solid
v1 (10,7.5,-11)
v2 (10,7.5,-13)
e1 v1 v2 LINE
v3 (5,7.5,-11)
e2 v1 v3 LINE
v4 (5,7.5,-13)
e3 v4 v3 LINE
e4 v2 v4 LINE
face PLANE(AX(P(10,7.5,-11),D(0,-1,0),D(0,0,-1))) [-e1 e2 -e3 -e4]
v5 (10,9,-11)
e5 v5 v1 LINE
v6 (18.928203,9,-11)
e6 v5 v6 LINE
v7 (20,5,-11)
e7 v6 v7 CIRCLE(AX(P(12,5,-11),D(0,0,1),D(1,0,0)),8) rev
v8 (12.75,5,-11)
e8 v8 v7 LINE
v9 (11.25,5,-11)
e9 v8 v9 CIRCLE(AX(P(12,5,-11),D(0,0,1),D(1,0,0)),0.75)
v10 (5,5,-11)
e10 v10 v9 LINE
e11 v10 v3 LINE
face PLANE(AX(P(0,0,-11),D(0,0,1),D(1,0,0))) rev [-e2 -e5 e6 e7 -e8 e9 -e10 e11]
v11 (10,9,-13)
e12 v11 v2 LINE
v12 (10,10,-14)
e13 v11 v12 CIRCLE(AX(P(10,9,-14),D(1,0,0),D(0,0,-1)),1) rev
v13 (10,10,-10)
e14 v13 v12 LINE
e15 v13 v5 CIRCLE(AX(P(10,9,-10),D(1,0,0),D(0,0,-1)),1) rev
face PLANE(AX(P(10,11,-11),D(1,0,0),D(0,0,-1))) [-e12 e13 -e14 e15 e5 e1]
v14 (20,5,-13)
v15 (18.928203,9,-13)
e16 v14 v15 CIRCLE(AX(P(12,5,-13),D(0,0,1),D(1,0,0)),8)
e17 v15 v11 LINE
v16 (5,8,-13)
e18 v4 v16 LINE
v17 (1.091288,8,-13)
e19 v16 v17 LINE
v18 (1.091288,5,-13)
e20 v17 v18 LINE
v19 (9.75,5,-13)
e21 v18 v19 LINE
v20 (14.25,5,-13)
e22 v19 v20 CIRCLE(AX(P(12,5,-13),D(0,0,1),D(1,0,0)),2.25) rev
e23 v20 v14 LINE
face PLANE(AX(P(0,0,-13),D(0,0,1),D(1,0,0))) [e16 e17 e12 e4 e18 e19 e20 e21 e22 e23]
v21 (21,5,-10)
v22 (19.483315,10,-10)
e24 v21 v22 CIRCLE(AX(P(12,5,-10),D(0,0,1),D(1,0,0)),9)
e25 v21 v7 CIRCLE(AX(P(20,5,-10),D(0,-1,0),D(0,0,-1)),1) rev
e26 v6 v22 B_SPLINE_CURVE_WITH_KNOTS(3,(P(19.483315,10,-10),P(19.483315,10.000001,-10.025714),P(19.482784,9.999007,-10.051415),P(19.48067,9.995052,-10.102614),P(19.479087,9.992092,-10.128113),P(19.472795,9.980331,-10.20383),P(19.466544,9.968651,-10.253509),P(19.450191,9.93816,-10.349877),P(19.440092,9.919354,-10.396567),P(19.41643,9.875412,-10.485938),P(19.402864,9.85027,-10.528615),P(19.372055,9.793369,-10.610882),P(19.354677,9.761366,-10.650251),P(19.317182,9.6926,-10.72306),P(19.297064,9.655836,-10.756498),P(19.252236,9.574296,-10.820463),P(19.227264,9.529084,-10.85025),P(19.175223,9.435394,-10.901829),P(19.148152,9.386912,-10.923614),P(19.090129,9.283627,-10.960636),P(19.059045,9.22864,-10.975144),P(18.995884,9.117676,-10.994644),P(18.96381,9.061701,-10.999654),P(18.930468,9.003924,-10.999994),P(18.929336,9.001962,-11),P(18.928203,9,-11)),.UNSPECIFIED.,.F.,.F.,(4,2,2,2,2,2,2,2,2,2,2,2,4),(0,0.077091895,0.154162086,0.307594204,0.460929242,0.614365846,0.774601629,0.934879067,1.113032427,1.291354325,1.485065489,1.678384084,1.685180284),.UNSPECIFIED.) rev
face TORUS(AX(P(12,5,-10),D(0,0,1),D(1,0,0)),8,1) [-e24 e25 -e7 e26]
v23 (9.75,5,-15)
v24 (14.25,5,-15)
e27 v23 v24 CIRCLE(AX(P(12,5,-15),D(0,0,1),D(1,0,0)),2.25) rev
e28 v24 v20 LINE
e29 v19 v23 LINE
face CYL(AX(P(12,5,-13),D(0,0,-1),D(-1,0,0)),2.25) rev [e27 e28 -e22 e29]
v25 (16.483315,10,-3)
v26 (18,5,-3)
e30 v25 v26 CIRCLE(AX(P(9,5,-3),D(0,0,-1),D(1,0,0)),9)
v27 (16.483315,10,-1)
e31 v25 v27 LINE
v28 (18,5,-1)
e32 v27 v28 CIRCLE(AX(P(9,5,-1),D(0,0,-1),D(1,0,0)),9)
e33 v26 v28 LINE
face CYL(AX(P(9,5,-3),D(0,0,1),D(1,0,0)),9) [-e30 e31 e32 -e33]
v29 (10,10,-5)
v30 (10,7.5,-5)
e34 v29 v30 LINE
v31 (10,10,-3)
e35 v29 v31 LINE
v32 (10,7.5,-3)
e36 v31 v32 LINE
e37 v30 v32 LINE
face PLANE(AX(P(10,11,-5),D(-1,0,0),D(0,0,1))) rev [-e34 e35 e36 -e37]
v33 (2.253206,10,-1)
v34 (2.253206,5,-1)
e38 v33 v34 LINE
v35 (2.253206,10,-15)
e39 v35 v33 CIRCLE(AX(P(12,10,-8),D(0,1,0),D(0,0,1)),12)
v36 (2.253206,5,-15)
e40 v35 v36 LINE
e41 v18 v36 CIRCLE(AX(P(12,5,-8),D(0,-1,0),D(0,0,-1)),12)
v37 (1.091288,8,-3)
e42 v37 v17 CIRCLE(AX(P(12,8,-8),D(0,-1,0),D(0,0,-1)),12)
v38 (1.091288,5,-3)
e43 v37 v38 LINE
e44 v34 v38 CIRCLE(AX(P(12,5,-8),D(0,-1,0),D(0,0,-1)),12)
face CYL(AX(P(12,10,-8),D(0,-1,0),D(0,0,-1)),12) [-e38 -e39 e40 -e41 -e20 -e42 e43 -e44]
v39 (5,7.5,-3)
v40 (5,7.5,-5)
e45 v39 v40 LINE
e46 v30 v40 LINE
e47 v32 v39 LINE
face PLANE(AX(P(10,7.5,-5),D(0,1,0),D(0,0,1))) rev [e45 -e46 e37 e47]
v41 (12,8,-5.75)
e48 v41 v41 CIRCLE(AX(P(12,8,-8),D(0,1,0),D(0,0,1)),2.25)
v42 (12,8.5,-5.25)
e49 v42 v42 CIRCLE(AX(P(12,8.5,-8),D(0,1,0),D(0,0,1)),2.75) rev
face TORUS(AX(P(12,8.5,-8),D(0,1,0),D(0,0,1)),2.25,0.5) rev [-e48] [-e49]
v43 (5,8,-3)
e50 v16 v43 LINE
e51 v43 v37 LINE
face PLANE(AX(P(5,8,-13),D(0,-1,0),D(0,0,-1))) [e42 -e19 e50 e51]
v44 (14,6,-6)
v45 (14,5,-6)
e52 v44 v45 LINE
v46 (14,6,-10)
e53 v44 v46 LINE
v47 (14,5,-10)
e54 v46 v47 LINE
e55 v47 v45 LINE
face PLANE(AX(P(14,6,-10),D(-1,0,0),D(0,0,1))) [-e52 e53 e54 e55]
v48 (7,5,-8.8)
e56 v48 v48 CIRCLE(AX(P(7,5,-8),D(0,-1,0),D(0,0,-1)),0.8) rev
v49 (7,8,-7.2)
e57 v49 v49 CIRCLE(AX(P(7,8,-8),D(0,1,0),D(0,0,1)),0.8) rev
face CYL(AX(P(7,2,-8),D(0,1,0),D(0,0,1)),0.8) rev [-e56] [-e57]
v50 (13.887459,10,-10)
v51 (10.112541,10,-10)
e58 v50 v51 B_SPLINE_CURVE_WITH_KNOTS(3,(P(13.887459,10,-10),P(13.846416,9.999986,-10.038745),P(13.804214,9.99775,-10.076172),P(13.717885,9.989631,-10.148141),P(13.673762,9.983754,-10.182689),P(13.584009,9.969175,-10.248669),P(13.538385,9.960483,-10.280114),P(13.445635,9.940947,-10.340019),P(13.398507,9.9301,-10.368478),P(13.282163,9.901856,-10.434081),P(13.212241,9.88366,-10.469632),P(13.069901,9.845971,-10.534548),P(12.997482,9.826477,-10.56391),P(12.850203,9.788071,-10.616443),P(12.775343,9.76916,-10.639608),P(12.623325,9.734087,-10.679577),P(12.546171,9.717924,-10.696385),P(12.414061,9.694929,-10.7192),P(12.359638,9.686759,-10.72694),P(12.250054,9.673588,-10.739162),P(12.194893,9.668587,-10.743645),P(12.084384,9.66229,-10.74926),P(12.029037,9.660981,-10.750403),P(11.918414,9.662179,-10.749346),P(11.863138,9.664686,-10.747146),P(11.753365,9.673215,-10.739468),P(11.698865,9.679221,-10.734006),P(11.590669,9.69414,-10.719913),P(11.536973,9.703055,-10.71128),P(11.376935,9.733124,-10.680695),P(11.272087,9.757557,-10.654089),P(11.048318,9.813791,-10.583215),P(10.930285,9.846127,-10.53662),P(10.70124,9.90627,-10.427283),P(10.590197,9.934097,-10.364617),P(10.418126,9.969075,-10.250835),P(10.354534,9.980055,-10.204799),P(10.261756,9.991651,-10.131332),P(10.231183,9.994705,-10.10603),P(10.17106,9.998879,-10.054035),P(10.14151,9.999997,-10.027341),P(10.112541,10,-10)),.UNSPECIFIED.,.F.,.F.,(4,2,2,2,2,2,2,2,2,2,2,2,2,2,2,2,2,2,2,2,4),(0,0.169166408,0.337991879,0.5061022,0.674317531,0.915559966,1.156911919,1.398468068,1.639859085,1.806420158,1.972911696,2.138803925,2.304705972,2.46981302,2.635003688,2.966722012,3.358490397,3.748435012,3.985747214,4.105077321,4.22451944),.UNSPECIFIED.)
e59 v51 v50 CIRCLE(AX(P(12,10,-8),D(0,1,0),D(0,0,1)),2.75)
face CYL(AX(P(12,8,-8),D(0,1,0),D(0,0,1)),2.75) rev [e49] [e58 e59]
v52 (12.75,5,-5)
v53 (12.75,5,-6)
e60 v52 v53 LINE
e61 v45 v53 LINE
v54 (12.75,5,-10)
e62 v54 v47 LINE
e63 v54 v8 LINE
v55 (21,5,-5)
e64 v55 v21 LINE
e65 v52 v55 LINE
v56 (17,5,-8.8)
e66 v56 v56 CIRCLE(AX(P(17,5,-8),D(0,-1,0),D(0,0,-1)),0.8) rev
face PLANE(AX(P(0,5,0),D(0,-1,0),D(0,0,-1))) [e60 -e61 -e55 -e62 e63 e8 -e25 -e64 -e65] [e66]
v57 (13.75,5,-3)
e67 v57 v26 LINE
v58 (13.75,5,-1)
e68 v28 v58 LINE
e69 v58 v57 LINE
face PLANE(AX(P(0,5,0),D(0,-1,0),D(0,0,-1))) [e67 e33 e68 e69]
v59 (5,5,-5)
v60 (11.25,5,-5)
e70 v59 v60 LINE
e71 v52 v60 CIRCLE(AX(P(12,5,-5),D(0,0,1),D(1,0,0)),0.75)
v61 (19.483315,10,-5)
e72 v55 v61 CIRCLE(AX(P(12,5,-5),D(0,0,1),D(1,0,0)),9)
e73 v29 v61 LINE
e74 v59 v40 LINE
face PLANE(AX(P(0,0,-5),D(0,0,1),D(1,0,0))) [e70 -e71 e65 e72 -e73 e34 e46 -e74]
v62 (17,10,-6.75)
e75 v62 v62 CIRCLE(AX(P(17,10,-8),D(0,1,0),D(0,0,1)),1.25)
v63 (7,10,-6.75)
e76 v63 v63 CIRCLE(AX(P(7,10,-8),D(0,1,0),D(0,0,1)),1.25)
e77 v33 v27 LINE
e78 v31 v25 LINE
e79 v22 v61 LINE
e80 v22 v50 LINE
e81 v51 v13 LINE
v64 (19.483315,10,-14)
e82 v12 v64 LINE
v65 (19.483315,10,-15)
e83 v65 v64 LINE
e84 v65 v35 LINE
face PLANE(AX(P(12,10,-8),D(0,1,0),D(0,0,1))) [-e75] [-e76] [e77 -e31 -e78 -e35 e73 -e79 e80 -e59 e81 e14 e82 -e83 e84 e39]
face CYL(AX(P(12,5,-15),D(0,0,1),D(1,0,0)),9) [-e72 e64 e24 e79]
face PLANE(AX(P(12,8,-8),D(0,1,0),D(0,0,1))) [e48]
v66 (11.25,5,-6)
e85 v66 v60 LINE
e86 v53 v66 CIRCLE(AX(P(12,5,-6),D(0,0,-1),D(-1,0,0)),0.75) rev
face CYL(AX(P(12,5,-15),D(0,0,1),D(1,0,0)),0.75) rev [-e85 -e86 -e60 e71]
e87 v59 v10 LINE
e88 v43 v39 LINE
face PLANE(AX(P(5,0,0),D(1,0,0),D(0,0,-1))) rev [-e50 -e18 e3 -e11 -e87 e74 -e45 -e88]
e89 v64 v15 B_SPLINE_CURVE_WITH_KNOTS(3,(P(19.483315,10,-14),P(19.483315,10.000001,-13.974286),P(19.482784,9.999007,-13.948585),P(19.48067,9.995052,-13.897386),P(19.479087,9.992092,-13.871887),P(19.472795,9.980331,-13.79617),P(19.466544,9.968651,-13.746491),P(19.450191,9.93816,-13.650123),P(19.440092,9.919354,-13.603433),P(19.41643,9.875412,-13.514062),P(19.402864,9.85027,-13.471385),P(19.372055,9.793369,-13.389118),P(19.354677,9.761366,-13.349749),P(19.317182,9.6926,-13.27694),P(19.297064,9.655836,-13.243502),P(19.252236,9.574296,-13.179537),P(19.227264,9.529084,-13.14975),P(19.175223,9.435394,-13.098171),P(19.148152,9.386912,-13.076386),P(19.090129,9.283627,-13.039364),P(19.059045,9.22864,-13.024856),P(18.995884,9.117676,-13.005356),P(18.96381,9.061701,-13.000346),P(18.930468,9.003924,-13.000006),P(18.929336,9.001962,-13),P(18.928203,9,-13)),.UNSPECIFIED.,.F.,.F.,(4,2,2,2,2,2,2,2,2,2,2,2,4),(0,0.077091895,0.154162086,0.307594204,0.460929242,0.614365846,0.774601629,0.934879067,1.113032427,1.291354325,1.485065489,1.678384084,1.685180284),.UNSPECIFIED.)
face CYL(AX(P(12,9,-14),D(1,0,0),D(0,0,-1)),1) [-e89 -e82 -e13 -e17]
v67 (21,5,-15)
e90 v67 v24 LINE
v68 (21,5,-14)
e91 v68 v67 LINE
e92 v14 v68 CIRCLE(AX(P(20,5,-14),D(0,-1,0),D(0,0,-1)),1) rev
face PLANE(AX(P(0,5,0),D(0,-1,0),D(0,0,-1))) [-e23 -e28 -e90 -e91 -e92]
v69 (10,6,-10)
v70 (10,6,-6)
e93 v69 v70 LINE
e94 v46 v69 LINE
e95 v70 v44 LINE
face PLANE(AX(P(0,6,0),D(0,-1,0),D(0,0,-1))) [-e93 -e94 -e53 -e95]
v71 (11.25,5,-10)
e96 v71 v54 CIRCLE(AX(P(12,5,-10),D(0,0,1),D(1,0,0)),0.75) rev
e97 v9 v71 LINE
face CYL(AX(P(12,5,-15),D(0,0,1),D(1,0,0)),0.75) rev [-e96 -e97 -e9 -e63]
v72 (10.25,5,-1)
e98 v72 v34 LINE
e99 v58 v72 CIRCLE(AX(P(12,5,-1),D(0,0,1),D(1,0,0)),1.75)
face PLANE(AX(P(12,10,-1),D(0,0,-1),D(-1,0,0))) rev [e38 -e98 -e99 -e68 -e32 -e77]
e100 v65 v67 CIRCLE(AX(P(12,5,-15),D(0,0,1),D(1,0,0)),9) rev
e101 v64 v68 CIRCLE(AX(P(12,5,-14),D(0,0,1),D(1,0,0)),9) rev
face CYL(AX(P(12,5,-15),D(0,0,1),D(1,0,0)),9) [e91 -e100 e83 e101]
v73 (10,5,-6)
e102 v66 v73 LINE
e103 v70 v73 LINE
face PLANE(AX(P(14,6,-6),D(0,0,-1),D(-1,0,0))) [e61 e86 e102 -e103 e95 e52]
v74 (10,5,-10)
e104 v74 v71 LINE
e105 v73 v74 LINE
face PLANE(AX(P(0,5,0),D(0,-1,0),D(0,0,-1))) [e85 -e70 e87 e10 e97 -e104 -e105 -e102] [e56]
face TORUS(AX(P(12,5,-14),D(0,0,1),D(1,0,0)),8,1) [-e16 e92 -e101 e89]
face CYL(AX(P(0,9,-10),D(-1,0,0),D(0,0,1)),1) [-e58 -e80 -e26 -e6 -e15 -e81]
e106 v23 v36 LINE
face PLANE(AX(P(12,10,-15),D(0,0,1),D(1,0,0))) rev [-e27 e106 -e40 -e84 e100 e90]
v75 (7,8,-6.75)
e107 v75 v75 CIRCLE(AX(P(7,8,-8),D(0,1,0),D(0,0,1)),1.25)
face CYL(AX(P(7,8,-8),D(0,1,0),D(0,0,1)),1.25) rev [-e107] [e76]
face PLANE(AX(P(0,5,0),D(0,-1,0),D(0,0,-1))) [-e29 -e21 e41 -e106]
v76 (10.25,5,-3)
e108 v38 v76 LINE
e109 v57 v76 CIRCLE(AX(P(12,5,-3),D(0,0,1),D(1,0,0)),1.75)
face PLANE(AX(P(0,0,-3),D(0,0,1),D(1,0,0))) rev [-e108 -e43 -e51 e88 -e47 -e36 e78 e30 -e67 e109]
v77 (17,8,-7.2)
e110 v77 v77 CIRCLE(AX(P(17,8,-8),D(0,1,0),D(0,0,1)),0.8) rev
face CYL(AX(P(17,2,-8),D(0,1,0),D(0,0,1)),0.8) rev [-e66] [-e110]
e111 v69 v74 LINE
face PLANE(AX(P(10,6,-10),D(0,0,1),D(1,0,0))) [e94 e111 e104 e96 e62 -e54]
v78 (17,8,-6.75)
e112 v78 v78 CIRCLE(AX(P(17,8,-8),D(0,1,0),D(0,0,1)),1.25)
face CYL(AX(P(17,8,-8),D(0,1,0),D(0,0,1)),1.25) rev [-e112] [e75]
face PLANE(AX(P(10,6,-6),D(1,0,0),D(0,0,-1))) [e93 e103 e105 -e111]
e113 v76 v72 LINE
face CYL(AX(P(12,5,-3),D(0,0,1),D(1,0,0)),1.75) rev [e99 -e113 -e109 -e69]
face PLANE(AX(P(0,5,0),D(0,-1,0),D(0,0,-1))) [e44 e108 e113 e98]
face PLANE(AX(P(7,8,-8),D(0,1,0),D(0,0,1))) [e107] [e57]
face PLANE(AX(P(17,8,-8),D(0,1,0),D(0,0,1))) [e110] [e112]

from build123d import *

# Parameters (mm, degrees)
BOSS_EXTRUDE1_DEPTH = 10
CUT_EXTRUDE3_DEPTH  = 28.676705006
CUT_EXTRUDE6_START  = -13
CUT_EXTRUDE6_DEPTH  = 2
CUT_EXTRUDE14_START = -3
CUT_EXTRUDE14_DEPTH = 2
CUT_EXTRUDE7_START  = 10
SKETCH8_R           = 2.75
CUT_EXTRUDE7_DEPTH  = 2
CUT_EXTRUDE8_START  = -16
SKETCH10_R          = 2.25
CUT_EXTRUDE8_DEPTH  = 3
CUT_EXTRUDE9_DEPTH  = 5
SKETCH18_R          = 0.75
CUT_EXTRUDE12_DEPTH = 28.676705006
CUT_EXTRUDE13_START = 5
SKETCH19_W          = 4
SKETCH19_H          = 4
CUT_EXTRUDE13_DEPTH = 1
CUT_EXTRUDE15_START = -1
SKETCH5_R           = 1.75
CUT_EXTRUDE15_DEPTH = 2
CUT_EXTRUDE16_START = -1
CUT_EXTRUDE16_DEPTH = 2
FILLET2_R           = 0.5
FILLET3_R           = 1
POT_INSERT_DEPTH    = 2.5
POT_START           = 4
SKETCH6_R           = 2.75
POT_HOLE_DEPTH      = 1.5
SCREW_START         = 11
SKETCH14_R          = 0.8
SCREW_HOLES_DEPTH   = 9
SCREW_START_2       = 10
SKETCH15_R          = 1.25
SCREW_HEADS_DEPTH   = 2
SKETCH13_W          = 21
SKETCH13_H          = 15
CUT_EXTRUDE11_DEPTH = 5


with BuildPart() as part:
    # Sketch1 → Boss-Extrude1 (new body)
    with BuildSketch(Plane(origin=(0, 0, 0), x_dir=(1, 0, 0), z_dir=(0, 1, 0))):
        with BuildLine():
            Line((21, 15), (21, 8))
            Line((21, 8), (21, 1))
            Line((21, 1), (12, 1))
            Line((12, 1), (2.253205655, 1))
            ThreePointArc((2.253205655, 1), (0, 8), (2.253205655, 15))
            Line((2.253205655, 15), (12, 15))
            Line((12, 15), (21, 15))
        make_face()
    extrude(amount=BOSS_EXTRUDE1_DEPTH)

    # Sketch4 → Cut-Extrude3 (cut, through all)
    with BuildSketch(Plane.XY):
        with BuildLine():
            Line((21, 14), (12, 14))
            ThreePointArc((12, 14), (18.363961031, 11.363961031), (21, 5))
            Line((21, 5), (21, 14))
        make_face()
        with BuildLine():
            Line((21, -4), (21, 5))
            ThreePointArc((21, 5), (18.363961031, -1.363961031), (12, -4))
            Line((12, -4), (21, -4))
        make_face()
    extrude(amount=-CUT_EXTRUDE3_DEPTH, mode=Mode.SUBTRACT)

    # Sketch7 → Cut-Extrude6 (cut)
    with BuildSketch(Plane.XY.offset(CUT_EXTRUDE6_START)):
        Polygon((21, 5.5), (21, 11), (10, 11), (10, 7.5), (0, 7.5), (0, 3.5), (21, 3.5), align=None)
    extrude(amount=CUT_EXTRUDE6_DEPTH, mode=Mode.SUBTRACT)

    # Sketch21 → Cut-Extrude14 (cut)
    with BuildSketch(Plane.XY.offset(CUT_EXTRUDE14_START)):
        Polygon((21, 5.5), (21, 11), (10, 11), (10, 7.5), (0, 7.5), (0, 3.5), (21, 3.5), align=None)
    extrude(amount=-CUT_EXTRUDE14_DEPTH, mode=Mode.SUBTRACT)

    # Sketch8 → Cut-Extrude7 (cut)
    with BuildSketch(Plane(origin=(0, 0, 0), x_dir=(1, 0, 0), z_dir=(0, 1, 0)).offset(CUT_EXTRUDE7_START)):
        with Locations(Location((12, 8, 0), (0, 0, 270))):
            Circle(SKETCH8_R)
    extrude(amount=-CUT_EXTRUDE7_DEPTH, mode=Mode.SUBTRACT)

    # Sketch10 → Cut-Extrude8 (cut)
    with BuildSketch(Plane.XY.offset(CUT_EXTRUDE8_START)):
        with Locations(Location((12, 5, 0), (0, 0, 221.810314896))):
            Circle(SKETCH10_R)
    extrude(amount=CUT_EXTRUDE8_DEPTH, mode=Mode.SUBTRACT)

    # Sketch11 → Cut-Extrude9 (cut)
    with BuildSketch(Plane(origin=(0, 0, 0), x_dir=(0, 0, -1), z_dir=(1, 0, 0))):
        Polygon((8, 2), (13, 2), (13, 8), (3, 8), (3, 2), align=None)
    extrude(amount=CUT_EXTRUDE9_DEPTH, mode=Mode.SUBTRACT)

    # Sketch18 → Cut-Extrude12 (cut, through all)
    with BuildSketch(Plane.XY):
        with Locations((12, 5)):
            Circle(SKETCH18_R)
    extrude(amount=-CUT_EXTRUDE12_DEPTH, mode=Mode.SUBTRACT)

    # Sketch19 → Cut-Extrude13 (cut, symmetric)
    with BuildSketch(Plane(origin=(0, 0, 0), x_dir=(1, 0, 0), z_dir=(0, 1, 0)).offset(CUT_EXTRUDE13_START)):
        with Locations((12, 8)):
            Rectangle(SKETCH19_W, SKETCH19_H)
    extrude(amount=CUT_EXTRUDE13_DEPTH, both=True, mode=Mode.SUBTRACT)

    # Sketch5 → Cut-Extrude15 (cut)
    with BuildSketch(Plane.XY.offset(CUT_EXTRUDE15_START)):
        with Locations((12, 5)):
            Circle(SKETCH5_R)
    extrude(amount=-CUT_EXTRUDE15_DEPTH, mode=Mode.SUBTRACT)

    # Sketch26 → Cut-Extrude16 (cut)
    with BuildSketch(Plane.XY.offset(CUT_EXTRUDE16_START)):
        with BuildLine():
            Line((16.483314774, 10), (19.483314774, 10))
            ThreePointArc((19.483314774, 10), (20.800790614, 6.883105034), (20.874119675, 3.5))
            Line((20.874119675, 3.5), (17.874119675, 3.5))
            ThreePointArc((17.874119675, 3.5), (17.800790614, 6.883105034), (16.483314774, 10))
        make_face()
    extrude(amount=-CUT_EXTRUDE16_DEPTH, mode=Mode.SUBTRACT)

    # Fillet2
    fillet2_edges = [part.edges().sort_by_distance(p)[0] for p in [
        (12, 8, -10.75),
    ]]
    fillet(fillet2_edges, radius=FILLET2_R)

    # Fillet3
    # the kernel refuses this fillet: 1 mm, written as the material it takes off along each edge
    with BuildSketch(Plane(origin=(12, 5, -13), x_dir=(0.6472427025312245, 0.7622839917118008, 0), z_dir=(-0.7622839917118008, 0.6472427025312245, 0))) as fillet3_piece_1_section:
        with BuildLine():
            CenterArc((9 - FILLET3_R, FILLET3_R), FILLET3_R, 270, 90)
            Line((9 - FILLET3_R, 0), (9, 0))
            Line((9, 0), (9, FILLET3_R))
        make_face()
    fillet3_piece_1 = revolve(axis=Axis((12, 5, -13), (0, 0, -1)), revolution_arc=75.177010416, mode=Mode.PRIVATE)
    fillet3_piece_1 = split(fillet3_piece_1, bisect_by=Plane(origin=(20.22008164, 3.5, -13.28352735), z_dir=(0, 1, 0)), keep=Keep.TOP, mode=Mode.PRIVATE)
    add(fillet3_piece_1, mode=Mode.SUBTRACT)
    with BuildSketch(Plane(origin=(12, 5, -11), x_dir=(0.9025022770828605, -0.43068508200337235, 0), z_dir=(-0.43068508200337235, -0.9025022770828605, 0))) as fillet3_piece_2_section:
        with BuildLine():
            CenterArc((9 - FILLET3_R, FILLET3_R), FILLET3_R, 270, 90)
            Line((9 - FILLET3_R, 0), (9, 0))
            Line((9, 0), (9, FILLET3_R))
        make_face()
    fillet3_piece_2 = revolve(axis=Axis((12, 5, -11), (0, 0, 1)), revolution_arc=75.177010416, mode=Mode.PRIVATE)
    fillet3_piece_2 = split(fillet3_piece_2, bisect_by=Plane(origin=(20.220081643, 3.5, -10.716472653), z_dir=(0, 1, 0)), keep=Keep.TOP, mode=Mode.PRIVATE)
    add(fillet3_piece_2, mode=Mode.SUBTRACT)
    with BuildSketch(Plane(origin=(21.983314774, 10, -11), x_dir=(0, 0, 1), z_dir=(-1, 0, 0))) as fillet3_piece_3:
        with BuildLine():
            CenterArc((FILLET3_R, -FILLET3_R), FILLET3_R, 90, 90)
            Line((0, -FILLET3_R), (0, 0))
            Line((0, 0), (FILLET3_R, 0))
        make_face()
    extrude(amount=11.983314774, mode=Mode.SUBTRACT)
    with BuildSketch(Plane(origin=(21.983314774, 10, -13), x_dir=(0, 0, -1), z_dir=(-1, 0, 0))) as fillet3_piece_4:
        with BuildLine():
            CenterArc((FILLET3_R, FILLET3_R), FILLET3_R, 180, 90)
            Line((0, FILLET3_R), (0, 0))
            Line((0, 0), (FILLET3_R, 0))
        make_face()
    extrude(amount=11.983314774, mode=Mode.SUBTRACT)

    # Sketch3 → Pot Insert (cut)
    with BuildSketch(Plane(origin=(28.28760271, 0, 0), x_dir=(1, 0, 0), z_dir=(0, 1, 0))):
        Polygon((-25.28760271, 12.5), (-20.53760271, 12.5), (-20.53760271, 13.5), (-16.28760271, 13.5), (-12.291072924, 13.5), (-12.291072924, 12.500096395), (-10.791072924, 9.500096395), (-9.28760271, 9.500096395), (-9.28760271, 8), (-9.28760271, 6.5), (-10.78760271, 6.5), (-12.28760271, 3.5), (-12.28760271, 2.5), (-16.28760271, 2.5), (-20.53760271, 2.5), (-20.53760271, 3.5), (-25.28760271, 3.5), (-25.28760271, 8), align=None)
    extrude(amount=POT_INSERT_DEPTH, mode=Mode.SUBTRACT)

    # Sketch6 → Pot Hole (cut)
    with BuildSketch(Plane(origin=(0, 0, 0), x_dir=(1, 0, 0), z_dir=(0, 1, 0)).offset(POT_START)):
        with Locations(Location((12, 8, 0), (0, 0, 270))):
            Circle(SKETCH6_R)
    extrude(amount=-POT_HOLE_DEPTH, mode=Mode.SUBTRACT)

    # Sketch14 → Screw Holes (cut)
    with BuildSketch(Plane(origin=(0, 0, 0), x_dir=(1, 0, 0), z_dir=(0, 1, 0)).offset(SCREW_START)):
        with Locations(Location((7, 8, 0), (0, 0, 270))):
            Circle(SKETCH14_R)
        with Locations(Location((17, 8, 0), (0, 0, 270))):
            Circle(SKETCH14_R)
    extrude(amount=-SCREW_HOLES_DEPTH, mode=Mode.SUBTRACT)

    # Sketch15 → Screw Heads (cut)
    with BuildSketch(Plane(origin=(0, 0, 0), x_dir=(1, 0, 0), z_dir=(0, 1, 0)).offset(SCREW_START_2)):
        with Locations(Location((7, 8, 0), (0, 0, 270))):
            Circle(SKETCH15_R)
        with Locations(Location((17, 8, 0), (0, 0, 270))):
            Circle(SKETCH15_R)
    extrude(amount=-SCREW_HEADS_DEPTH, mode=Mode.SUBTRACT)

    # Sketch13 → Cut-Extrude11 (cut)
    with BuildSketch(Plane(origin=(0, 0, 0), x_dir=(1, 0, 0), z_dir=(0, 1, 0))):
        with Locations((10.5, 7.5)):
            Rectangle(SKETCH13_W, SKETCH13_H)
    extrude(amount=CUT_EXTRUDE11_DEPTH, mode=Mode.SUBTRACT)


solid = part.part
